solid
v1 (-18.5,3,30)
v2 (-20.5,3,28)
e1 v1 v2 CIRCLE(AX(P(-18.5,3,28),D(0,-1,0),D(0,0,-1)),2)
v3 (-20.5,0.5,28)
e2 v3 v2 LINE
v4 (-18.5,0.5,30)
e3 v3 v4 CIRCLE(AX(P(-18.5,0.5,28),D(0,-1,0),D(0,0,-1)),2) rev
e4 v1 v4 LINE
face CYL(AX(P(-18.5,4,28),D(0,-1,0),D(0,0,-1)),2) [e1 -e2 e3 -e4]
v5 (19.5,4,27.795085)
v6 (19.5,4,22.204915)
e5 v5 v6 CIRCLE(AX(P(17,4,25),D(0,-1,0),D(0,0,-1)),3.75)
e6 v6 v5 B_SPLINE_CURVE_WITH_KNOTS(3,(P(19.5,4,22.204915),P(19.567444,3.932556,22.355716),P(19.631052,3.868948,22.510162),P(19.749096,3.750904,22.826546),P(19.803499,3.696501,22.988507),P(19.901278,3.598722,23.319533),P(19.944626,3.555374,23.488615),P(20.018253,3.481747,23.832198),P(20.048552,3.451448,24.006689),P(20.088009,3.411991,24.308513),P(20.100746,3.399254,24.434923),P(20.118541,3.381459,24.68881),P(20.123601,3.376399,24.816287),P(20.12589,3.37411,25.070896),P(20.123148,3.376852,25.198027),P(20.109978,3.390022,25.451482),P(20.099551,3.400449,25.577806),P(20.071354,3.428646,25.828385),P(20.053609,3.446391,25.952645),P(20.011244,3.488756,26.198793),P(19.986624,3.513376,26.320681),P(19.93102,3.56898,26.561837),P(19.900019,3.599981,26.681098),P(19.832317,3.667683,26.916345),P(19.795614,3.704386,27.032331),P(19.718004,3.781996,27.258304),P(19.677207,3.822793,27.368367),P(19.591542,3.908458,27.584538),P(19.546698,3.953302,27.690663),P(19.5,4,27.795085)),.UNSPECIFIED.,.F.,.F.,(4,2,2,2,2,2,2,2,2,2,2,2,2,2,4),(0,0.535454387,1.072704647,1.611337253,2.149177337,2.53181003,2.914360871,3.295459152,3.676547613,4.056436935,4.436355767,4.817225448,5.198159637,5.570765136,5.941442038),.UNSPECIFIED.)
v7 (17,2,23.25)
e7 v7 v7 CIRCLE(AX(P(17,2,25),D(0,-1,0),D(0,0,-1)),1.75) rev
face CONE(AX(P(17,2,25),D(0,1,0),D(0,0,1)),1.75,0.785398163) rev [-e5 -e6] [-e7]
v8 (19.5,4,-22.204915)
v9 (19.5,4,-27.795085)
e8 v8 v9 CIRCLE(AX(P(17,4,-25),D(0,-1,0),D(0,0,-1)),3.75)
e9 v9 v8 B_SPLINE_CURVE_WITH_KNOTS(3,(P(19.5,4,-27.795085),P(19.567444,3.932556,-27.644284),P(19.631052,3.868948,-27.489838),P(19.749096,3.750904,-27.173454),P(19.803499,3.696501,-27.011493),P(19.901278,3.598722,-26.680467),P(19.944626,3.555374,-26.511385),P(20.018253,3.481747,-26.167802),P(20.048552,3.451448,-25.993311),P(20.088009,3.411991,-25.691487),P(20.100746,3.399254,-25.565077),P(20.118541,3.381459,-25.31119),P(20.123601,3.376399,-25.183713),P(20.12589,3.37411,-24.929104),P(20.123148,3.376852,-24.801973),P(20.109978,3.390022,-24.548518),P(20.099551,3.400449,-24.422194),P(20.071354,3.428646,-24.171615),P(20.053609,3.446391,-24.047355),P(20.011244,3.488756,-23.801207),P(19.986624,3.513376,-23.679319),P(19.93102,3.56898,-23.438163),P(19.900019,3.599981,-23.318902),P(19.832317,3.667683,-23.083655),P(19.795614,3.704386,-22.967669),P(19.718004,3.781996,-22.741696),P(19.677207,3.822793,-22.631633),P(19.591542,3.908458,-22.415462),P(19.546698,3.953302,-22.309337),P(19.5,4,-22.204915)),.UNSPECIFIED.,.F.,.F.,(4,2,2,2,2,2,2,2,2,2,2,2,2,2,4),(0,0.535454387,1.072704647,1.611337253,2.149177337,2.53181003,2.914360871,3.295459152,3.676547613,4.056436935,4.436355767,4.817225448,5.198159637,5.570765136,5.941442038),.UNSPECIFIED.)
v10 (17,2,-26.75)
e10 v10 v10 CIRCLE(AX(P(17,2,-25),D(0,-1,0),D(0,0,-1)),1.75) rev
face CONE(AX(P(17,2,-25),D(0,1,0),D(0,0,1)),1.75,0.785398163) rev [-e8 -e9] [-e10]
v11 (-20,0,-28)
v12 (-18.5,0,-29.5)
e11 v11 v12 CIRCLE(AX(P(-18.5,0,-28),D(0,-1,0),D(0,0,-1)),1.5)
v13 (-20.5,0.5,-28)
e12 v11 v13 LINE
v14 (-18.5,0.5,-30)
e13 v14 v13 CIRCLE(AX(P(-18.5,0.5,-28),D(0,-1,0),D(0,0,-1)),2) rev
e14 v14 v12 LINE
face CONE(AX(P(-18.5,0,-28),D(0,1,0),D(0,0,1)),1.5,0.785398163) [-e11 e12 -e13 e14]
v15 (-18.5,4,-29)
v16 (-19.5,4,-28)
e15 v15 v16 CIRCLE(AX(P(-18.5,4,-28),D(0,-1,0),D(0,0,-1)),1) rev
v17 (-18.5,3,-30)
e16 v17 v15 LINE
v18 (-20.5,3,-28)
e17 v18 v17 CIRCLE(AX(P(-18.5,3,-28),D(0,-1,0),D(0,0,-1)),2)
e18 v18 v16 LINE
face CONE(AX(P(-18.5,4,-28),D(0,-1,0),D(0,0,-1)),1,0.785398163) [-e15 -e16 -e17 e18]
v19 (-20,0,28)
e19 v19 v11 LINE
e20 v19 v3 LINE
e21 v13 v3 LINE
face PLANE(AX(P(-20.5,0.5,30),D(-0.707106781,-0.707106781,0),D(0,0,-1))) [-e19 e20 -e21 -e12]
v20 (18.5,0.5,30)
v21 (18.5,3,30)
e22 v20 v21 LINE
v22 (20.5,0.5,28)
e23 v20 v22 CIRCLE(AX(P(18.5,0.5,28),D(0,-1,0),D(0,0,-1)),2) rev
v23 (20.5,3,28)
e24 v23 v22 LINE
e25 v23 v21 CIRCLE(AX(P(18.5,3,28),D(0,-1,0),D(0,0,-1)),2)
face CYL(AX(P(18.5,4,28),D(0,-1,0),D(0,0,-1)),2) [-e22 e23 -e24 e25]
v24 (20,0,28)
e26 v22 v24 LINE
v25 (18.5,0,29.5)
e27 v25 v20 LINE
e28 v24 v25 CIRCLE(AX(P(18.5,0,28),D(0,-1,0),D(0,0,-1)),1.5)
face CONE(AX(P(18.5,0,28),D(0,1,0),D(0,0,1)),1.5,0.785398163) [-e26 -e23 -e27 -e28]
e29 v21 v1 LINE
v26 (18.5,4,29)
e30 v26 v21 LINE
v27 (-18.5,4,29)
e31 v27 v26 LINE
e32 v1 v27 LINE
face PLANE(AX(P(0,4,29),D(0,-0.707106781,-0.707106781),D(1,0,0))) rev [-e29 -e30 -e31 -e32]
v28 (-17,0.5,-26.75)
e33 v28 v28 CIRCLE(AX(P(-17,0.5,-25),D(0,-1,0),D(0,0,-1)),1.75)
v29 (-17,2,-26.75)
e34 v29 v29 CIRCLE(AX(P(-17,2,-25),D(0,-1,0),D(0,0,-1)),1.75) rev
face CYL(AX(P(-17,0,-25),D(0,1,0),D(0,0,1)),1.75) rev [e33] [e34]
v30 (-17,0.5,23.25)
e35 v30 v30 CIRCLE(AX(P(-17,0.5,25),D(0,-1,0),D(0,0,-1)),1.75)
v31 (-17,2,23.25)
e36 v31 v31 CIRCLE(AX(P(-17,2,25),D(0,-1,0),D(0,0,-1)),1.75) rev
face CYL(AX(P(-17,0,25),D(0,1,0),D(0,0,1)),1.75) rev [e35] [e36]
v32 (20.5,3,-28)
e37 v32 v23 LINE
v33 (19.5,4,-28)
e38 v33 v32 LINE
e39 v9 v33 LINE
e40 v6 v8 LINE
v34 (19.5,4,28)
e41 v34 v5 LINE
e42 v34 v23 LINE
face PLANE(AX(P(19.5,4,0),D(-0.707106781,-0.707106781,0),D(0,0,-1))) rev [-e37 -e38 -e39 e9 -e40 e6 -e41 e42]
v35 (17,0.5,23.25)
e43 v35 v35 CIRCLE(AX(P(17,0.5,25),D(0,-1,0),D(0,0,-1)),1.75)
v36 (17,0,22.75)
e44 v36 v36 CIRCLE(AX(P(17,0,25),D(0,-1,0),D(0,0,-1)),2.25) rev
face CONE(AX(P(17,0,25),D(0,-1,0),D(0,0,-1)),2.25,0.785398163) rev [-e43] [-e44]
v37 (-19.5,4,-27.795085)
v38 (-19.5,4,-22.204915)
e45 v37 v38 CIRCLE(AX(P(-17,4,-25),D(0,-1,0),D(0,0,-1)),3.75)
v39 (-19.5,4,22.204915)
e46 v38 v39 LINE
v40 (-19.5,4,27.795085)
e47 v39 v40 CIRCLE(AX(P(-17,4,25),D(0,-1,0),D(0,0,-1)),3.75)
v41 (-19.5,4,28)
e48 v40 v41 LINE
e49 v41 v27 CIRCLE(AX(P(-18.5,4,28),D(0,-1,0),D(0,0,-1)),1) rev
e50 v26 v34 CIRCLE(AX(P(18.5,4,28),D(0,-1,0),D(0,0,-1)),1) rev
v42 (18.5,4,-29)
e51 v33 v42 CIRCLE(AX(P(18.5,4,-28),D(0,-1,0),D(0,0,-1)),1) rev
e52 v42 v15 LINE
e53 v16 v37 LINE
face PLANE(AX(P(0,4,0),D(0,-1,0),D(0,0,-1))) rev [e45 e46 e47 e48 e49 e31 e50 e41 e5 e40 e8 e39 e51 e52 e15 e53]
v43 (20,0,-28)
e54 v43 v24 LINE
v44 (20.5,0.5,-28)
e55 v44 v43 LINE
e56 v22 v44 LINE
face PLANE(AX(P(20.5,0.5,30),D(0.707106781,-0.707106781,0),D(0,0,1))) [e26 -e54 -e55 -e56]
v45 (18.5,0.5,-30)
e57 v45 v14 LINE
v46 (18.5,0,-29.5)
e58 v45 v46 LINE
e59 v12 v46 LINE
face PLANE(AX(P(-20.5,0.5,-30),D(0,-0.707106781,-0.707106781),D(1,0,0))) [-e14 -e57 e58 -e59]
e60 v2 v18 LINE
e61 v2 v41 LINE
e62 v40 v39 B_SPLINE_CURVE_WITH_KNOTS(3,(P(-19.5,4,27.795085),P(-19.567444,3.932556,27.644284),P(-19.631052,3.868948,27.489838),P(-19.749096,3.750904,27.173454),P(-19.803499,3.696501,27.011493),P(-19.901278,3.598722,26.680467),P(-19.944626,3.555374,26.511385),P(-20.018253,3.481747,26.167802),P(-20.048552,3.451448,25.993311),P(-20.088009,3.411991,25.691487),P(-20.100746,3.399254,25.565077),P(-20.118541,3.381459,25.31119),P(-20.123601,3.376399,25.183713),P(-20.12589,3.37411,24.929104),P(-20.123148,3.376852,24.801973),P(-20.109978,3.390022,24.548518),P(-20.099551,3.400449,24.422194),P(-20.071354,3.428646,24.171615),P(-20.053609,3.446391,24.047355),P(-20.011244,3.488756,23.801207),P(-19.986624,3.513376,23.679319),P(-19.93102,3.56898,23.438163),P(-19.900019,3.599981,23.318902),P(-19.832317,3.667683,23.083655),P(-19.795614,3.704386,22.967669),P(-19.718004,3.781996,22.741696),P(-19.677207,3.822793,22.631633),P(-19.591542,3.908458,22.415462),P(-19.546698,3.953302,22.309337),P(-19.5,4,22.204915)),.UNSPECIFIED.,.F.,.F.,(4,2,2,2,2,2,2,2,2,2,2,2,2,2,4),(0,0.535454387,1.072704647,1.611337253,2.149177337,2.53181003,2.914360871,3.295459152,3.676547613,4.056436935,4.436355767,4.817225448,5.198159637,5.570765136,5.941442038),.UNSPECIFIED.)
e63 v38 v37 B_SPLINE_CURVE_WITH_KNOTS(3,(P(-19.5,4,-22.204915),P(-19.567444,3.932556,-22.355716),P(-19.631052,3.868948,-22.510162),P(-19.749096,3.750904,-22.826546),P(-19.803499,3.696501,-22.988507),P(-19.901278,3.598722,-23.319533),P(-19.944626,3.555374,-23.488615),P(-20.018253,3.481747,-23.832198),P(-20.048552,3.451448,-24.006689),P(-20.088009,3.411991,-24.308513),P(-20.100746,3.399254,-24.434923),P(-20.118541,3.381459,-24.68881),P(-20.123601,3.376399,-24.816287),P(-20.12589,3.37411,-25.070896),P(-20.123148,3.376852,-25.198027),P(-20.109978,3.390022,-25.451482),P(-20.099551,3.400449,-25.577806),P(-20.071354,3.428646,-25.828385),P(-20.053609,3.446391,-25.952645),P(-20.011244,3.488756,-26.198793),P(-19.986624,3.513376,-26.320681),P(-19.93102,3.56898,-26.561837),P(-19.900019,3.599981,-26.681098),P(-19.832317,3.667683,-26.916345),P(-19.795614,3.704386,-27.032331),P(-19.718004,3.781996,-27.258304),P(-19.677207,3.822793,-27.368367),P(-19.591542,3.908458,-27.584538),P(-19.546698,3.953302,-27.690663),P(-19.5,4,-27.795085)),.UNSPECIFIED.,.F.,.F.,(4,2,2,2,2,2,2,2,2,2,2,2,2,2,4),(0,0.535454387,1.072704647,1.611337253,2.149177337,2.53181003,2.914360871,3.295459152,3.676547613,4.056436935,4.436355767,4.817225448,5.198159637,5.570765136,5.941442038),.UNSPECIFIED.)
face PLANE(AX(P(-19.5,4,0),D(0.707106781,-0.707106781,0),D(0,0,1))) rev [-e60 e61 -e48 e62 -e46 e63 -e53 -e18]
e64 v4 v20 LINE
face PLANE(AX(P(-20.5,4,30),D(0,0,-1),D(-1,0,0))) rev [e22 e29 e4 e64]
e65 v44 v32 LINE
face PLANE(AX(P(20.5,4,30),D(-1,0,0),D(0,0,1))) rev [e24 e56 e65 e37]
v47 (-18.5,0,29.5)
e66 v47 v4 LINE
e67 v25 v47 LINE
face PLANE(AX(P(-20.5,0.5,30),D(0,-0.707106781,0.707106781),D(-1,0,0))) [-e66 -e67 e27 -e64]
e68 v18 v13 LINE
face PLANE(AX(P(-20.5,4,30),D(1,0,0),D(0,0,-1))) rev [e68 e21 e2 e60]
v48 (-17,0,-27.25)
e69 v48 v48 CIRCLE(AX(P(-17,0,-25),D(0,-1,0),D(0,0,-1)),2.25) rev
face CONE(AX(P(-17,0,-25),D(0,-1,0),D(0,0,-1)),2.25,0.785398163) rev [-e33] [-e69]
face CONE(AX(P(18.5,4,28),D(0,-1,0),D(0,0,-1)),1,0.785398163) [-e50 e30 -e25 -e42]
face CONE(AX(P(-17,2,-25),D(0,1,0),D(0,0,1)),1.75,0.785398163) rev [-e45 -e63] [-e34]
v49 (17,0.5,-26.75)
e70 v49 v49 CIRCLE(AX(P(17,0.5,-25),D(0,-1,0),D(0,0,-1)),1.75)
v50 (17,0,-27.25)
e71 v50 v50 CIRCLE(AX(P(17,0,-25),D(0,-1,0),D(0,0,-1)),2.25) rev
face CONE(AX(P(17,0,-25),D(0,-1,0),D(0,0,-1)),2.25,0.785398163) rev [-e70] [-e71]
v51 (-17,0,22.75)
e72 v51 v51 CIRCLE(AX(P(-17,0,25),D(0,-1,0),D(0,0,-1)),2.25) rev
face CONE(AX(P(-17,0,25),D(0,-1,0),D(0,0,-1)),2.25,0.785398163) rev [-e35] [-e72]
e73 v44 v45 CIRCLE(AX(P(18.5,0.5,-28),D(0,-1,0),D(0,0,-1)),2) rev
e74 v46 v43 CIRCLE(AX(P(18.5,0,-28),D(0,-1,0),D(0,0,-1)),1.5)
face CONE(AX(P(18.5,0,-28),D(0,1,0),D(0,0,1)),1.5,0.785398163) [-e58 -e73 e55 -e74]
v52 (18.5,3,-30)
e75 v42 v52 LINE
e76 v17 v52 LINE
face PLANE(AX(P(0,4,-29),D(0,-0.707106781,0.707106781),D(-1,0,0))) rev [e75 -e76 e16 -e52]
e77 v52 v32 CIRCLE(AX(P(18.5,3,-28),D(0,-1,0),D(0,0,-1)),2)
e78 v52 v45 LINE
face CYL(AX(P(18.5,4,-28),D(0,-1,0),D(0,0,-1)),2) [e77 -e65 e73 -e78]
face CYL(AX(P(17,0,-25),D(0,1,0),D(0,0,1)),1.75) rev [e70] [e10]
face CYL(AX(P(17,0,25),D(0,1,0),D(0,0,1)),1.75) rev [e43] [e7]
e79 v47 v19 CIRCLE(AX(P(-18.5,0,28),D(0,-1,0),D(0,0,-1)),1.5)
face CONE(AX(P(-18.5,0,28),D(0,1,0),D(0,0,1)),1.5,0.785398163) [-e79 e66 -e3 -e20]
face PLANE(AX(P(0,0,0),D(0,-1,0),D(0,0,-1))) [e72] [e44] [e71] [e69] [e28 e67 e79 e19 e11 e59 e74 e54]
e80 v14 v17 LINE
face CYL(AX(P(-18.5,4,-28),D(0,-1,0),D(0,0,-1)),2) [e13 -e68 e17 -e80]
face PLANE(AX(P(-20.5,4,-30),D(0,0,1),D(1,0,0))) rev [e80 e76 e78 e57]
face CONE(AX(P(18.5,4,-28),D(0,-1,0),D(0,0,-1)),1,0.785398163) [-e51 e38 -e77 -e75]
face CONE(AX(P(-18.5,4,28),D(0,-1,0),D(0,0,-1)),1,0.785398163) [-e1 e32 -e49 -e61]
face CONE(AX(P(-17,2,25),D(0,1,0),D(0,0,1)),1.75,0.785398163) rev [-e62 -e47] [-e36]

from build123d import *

# Parameters (mm, degrees)
SKETCH_1_W          = 41
SKETCH_1_H          = 60
EXTRUDE_1_DEPTH     = 4
SKETCH_2_R          = 1.75
CUT_EXTRUDE_1_DEPTH = 37.554753453
FILLET_1_R          = 2
CHAMFER_2_SIZE      = 1
CHAMFER_1_SIZE      = 2
CHAMFER_3_SIZE      = 0.5


with BuildPart() as part:
    # Эскиз1 → Бобышка-Вытянуть1 (new body)
    with BuildSketch(Plane(origin=(0, 0, 0), x_dir=(1, 0, 0), z_dir=(0, 1, 0))):
        Rectangle(SKETCH_1_W, SKETCH_1_H)
    extrude(amount=EXTRUDE_1_DEPTH)

    # Эскиз2 → Вырез-Вытянуть1 (cut, through all)
    with BuildSketch(Plane(origin=(0, 4, 0), x_dir=(1, 0, 0), z_dir=(0, 1, 0))):
        with Locations(Location((17, 25, 0), (0, 0, 270))):
            Circle(SKETCH_2_R)
        with Locations(Location((17, -25, 0), (0, 0, 90))):
            Circle(SKETCH_2_R)
        with Locations(Location((-17, -25, 0), (0, 0, 270))):
            Circle(SKETCH_2_R)
        with Locations(Location((-17, 25, 0), (0, 0, 90))):
            Circle(SKETCH_2_R)
    extrude(amount=-CUT_EXTRUDE_1_DEPTH, mode=Mode.SUBTRACT)

    # Скругление1
    fillet_1_edges = [part.edges().sort_by_distance(p)[0] for p in [
        (20.5, 2, 30),
        (-20.5, 2, 30),
        (-20.5, 2, -30),
        (20.5, 2, -30),
    ]]
    fillet(fillet_1_edges, radius=FILLET_1_R)

    # Фаска2
    chamfer_2_edges = [part.edges().sort_by_distance(p)[0] for p in [
        (0, 4, -30),
        (20.5, 4, 0),
        (-20.5, 4, 0),
        (0, 4, 30),
        (19.914213562, 4, 29.414213562),
        (-19.914213562, 4, 29.414213562),
        (-19.914213562, 4, -29.414213562),
        (19.914213562, 4, -29.414213562),
    ]]
    chamfer(chamfer_2_edges, length=CHAMFER_2_SIZE)

    # Фаска1
    # the kernel refuses this chamfer: 2 mm, written as the material it takes off along each edge
    with BuildSketch(Plane(origin=(-17, 4, -25), x_dir=(0, 0, -1), z_dir=(1, 0, 0))) as chamfer_1_piece_1:
        Polygon((1.75 + CHAMFER_1_SIZE, 0), (1.75, -CHAMFER_1_SIZE), (1.75, 0), align=None)
    revolve(axis=Axis((-17, 4, -25), (0, 1, 0)), mode=Mode.SUBTRACT)
    with BuildSketch(Plane(origin=(-17, 4, 25), x_dir=(0, 0, 1), z_dir=(-1, 0, 0))) as chamfer_1_piece_2:
        Polygon((1.75 + CHAMFER_1_SIZE, 0), (1.75, -CHAMFER_1_SIZE), (1.75, 0), align=None)
    revolve(axis=Axis((-17, 4, 25), (0, 1, 0)), mode=Mode.SUBTRACT)
    with BuildSketch(Plane(origin=(17, 4, 25), x_dir=(0, 0, -1), z_dir=(1, 0, 0))) as chamfer_1_piece_3:
        Polygon((1.75 + CHAMFER_1_SIZE, 0), (1.75, -CHAMFER_1_SIZE), (1.75, 0), align=None)
    revolve(axis=Axis((17, 4, 25), (0, 1, 0)), mode=Mode.SUBTRACT)
    with BuildSketch(Plane(origin=(17, 4, -25), x_dir=(0, 0, 1), z_dir=(-1, 0, 0))) as chamfer_1_piece_4:
        Polygon((1.75 + CHAMFER_1_SIZE, 0), (1.75, -CHAMFER_1_SIZE), (1.75, 0), align=None)
    revolve(axis=Axis((17, 4, -25), (0, 1, 0)), mode=Mode.SUBTRACT)

    # Фаска3
    chamfer_3_edges = [part.edges().sort_by_distance(p)[0] for p in [
        (-17, 0, -23.25),
        (-17, 0, 23.25),
        (17, 0, 26.75),
        (17, 0, -26.75),
        (0, 0, -30),
        (20.5, 0, 0),
        (0, 0, 30),
        (-20.5, 0, 0),
        (19.914213562, 0, 29.414213562),
        (-19.914213562, 0, 29.414213562),
        (-19.914213562, 0, -29.414213562),
        (19.914213562, 0, -29.414213562),
    ]]
    chamfer(chamfer_3_edges, length=CHAMFER_3_SIZE)


solid = part.part
